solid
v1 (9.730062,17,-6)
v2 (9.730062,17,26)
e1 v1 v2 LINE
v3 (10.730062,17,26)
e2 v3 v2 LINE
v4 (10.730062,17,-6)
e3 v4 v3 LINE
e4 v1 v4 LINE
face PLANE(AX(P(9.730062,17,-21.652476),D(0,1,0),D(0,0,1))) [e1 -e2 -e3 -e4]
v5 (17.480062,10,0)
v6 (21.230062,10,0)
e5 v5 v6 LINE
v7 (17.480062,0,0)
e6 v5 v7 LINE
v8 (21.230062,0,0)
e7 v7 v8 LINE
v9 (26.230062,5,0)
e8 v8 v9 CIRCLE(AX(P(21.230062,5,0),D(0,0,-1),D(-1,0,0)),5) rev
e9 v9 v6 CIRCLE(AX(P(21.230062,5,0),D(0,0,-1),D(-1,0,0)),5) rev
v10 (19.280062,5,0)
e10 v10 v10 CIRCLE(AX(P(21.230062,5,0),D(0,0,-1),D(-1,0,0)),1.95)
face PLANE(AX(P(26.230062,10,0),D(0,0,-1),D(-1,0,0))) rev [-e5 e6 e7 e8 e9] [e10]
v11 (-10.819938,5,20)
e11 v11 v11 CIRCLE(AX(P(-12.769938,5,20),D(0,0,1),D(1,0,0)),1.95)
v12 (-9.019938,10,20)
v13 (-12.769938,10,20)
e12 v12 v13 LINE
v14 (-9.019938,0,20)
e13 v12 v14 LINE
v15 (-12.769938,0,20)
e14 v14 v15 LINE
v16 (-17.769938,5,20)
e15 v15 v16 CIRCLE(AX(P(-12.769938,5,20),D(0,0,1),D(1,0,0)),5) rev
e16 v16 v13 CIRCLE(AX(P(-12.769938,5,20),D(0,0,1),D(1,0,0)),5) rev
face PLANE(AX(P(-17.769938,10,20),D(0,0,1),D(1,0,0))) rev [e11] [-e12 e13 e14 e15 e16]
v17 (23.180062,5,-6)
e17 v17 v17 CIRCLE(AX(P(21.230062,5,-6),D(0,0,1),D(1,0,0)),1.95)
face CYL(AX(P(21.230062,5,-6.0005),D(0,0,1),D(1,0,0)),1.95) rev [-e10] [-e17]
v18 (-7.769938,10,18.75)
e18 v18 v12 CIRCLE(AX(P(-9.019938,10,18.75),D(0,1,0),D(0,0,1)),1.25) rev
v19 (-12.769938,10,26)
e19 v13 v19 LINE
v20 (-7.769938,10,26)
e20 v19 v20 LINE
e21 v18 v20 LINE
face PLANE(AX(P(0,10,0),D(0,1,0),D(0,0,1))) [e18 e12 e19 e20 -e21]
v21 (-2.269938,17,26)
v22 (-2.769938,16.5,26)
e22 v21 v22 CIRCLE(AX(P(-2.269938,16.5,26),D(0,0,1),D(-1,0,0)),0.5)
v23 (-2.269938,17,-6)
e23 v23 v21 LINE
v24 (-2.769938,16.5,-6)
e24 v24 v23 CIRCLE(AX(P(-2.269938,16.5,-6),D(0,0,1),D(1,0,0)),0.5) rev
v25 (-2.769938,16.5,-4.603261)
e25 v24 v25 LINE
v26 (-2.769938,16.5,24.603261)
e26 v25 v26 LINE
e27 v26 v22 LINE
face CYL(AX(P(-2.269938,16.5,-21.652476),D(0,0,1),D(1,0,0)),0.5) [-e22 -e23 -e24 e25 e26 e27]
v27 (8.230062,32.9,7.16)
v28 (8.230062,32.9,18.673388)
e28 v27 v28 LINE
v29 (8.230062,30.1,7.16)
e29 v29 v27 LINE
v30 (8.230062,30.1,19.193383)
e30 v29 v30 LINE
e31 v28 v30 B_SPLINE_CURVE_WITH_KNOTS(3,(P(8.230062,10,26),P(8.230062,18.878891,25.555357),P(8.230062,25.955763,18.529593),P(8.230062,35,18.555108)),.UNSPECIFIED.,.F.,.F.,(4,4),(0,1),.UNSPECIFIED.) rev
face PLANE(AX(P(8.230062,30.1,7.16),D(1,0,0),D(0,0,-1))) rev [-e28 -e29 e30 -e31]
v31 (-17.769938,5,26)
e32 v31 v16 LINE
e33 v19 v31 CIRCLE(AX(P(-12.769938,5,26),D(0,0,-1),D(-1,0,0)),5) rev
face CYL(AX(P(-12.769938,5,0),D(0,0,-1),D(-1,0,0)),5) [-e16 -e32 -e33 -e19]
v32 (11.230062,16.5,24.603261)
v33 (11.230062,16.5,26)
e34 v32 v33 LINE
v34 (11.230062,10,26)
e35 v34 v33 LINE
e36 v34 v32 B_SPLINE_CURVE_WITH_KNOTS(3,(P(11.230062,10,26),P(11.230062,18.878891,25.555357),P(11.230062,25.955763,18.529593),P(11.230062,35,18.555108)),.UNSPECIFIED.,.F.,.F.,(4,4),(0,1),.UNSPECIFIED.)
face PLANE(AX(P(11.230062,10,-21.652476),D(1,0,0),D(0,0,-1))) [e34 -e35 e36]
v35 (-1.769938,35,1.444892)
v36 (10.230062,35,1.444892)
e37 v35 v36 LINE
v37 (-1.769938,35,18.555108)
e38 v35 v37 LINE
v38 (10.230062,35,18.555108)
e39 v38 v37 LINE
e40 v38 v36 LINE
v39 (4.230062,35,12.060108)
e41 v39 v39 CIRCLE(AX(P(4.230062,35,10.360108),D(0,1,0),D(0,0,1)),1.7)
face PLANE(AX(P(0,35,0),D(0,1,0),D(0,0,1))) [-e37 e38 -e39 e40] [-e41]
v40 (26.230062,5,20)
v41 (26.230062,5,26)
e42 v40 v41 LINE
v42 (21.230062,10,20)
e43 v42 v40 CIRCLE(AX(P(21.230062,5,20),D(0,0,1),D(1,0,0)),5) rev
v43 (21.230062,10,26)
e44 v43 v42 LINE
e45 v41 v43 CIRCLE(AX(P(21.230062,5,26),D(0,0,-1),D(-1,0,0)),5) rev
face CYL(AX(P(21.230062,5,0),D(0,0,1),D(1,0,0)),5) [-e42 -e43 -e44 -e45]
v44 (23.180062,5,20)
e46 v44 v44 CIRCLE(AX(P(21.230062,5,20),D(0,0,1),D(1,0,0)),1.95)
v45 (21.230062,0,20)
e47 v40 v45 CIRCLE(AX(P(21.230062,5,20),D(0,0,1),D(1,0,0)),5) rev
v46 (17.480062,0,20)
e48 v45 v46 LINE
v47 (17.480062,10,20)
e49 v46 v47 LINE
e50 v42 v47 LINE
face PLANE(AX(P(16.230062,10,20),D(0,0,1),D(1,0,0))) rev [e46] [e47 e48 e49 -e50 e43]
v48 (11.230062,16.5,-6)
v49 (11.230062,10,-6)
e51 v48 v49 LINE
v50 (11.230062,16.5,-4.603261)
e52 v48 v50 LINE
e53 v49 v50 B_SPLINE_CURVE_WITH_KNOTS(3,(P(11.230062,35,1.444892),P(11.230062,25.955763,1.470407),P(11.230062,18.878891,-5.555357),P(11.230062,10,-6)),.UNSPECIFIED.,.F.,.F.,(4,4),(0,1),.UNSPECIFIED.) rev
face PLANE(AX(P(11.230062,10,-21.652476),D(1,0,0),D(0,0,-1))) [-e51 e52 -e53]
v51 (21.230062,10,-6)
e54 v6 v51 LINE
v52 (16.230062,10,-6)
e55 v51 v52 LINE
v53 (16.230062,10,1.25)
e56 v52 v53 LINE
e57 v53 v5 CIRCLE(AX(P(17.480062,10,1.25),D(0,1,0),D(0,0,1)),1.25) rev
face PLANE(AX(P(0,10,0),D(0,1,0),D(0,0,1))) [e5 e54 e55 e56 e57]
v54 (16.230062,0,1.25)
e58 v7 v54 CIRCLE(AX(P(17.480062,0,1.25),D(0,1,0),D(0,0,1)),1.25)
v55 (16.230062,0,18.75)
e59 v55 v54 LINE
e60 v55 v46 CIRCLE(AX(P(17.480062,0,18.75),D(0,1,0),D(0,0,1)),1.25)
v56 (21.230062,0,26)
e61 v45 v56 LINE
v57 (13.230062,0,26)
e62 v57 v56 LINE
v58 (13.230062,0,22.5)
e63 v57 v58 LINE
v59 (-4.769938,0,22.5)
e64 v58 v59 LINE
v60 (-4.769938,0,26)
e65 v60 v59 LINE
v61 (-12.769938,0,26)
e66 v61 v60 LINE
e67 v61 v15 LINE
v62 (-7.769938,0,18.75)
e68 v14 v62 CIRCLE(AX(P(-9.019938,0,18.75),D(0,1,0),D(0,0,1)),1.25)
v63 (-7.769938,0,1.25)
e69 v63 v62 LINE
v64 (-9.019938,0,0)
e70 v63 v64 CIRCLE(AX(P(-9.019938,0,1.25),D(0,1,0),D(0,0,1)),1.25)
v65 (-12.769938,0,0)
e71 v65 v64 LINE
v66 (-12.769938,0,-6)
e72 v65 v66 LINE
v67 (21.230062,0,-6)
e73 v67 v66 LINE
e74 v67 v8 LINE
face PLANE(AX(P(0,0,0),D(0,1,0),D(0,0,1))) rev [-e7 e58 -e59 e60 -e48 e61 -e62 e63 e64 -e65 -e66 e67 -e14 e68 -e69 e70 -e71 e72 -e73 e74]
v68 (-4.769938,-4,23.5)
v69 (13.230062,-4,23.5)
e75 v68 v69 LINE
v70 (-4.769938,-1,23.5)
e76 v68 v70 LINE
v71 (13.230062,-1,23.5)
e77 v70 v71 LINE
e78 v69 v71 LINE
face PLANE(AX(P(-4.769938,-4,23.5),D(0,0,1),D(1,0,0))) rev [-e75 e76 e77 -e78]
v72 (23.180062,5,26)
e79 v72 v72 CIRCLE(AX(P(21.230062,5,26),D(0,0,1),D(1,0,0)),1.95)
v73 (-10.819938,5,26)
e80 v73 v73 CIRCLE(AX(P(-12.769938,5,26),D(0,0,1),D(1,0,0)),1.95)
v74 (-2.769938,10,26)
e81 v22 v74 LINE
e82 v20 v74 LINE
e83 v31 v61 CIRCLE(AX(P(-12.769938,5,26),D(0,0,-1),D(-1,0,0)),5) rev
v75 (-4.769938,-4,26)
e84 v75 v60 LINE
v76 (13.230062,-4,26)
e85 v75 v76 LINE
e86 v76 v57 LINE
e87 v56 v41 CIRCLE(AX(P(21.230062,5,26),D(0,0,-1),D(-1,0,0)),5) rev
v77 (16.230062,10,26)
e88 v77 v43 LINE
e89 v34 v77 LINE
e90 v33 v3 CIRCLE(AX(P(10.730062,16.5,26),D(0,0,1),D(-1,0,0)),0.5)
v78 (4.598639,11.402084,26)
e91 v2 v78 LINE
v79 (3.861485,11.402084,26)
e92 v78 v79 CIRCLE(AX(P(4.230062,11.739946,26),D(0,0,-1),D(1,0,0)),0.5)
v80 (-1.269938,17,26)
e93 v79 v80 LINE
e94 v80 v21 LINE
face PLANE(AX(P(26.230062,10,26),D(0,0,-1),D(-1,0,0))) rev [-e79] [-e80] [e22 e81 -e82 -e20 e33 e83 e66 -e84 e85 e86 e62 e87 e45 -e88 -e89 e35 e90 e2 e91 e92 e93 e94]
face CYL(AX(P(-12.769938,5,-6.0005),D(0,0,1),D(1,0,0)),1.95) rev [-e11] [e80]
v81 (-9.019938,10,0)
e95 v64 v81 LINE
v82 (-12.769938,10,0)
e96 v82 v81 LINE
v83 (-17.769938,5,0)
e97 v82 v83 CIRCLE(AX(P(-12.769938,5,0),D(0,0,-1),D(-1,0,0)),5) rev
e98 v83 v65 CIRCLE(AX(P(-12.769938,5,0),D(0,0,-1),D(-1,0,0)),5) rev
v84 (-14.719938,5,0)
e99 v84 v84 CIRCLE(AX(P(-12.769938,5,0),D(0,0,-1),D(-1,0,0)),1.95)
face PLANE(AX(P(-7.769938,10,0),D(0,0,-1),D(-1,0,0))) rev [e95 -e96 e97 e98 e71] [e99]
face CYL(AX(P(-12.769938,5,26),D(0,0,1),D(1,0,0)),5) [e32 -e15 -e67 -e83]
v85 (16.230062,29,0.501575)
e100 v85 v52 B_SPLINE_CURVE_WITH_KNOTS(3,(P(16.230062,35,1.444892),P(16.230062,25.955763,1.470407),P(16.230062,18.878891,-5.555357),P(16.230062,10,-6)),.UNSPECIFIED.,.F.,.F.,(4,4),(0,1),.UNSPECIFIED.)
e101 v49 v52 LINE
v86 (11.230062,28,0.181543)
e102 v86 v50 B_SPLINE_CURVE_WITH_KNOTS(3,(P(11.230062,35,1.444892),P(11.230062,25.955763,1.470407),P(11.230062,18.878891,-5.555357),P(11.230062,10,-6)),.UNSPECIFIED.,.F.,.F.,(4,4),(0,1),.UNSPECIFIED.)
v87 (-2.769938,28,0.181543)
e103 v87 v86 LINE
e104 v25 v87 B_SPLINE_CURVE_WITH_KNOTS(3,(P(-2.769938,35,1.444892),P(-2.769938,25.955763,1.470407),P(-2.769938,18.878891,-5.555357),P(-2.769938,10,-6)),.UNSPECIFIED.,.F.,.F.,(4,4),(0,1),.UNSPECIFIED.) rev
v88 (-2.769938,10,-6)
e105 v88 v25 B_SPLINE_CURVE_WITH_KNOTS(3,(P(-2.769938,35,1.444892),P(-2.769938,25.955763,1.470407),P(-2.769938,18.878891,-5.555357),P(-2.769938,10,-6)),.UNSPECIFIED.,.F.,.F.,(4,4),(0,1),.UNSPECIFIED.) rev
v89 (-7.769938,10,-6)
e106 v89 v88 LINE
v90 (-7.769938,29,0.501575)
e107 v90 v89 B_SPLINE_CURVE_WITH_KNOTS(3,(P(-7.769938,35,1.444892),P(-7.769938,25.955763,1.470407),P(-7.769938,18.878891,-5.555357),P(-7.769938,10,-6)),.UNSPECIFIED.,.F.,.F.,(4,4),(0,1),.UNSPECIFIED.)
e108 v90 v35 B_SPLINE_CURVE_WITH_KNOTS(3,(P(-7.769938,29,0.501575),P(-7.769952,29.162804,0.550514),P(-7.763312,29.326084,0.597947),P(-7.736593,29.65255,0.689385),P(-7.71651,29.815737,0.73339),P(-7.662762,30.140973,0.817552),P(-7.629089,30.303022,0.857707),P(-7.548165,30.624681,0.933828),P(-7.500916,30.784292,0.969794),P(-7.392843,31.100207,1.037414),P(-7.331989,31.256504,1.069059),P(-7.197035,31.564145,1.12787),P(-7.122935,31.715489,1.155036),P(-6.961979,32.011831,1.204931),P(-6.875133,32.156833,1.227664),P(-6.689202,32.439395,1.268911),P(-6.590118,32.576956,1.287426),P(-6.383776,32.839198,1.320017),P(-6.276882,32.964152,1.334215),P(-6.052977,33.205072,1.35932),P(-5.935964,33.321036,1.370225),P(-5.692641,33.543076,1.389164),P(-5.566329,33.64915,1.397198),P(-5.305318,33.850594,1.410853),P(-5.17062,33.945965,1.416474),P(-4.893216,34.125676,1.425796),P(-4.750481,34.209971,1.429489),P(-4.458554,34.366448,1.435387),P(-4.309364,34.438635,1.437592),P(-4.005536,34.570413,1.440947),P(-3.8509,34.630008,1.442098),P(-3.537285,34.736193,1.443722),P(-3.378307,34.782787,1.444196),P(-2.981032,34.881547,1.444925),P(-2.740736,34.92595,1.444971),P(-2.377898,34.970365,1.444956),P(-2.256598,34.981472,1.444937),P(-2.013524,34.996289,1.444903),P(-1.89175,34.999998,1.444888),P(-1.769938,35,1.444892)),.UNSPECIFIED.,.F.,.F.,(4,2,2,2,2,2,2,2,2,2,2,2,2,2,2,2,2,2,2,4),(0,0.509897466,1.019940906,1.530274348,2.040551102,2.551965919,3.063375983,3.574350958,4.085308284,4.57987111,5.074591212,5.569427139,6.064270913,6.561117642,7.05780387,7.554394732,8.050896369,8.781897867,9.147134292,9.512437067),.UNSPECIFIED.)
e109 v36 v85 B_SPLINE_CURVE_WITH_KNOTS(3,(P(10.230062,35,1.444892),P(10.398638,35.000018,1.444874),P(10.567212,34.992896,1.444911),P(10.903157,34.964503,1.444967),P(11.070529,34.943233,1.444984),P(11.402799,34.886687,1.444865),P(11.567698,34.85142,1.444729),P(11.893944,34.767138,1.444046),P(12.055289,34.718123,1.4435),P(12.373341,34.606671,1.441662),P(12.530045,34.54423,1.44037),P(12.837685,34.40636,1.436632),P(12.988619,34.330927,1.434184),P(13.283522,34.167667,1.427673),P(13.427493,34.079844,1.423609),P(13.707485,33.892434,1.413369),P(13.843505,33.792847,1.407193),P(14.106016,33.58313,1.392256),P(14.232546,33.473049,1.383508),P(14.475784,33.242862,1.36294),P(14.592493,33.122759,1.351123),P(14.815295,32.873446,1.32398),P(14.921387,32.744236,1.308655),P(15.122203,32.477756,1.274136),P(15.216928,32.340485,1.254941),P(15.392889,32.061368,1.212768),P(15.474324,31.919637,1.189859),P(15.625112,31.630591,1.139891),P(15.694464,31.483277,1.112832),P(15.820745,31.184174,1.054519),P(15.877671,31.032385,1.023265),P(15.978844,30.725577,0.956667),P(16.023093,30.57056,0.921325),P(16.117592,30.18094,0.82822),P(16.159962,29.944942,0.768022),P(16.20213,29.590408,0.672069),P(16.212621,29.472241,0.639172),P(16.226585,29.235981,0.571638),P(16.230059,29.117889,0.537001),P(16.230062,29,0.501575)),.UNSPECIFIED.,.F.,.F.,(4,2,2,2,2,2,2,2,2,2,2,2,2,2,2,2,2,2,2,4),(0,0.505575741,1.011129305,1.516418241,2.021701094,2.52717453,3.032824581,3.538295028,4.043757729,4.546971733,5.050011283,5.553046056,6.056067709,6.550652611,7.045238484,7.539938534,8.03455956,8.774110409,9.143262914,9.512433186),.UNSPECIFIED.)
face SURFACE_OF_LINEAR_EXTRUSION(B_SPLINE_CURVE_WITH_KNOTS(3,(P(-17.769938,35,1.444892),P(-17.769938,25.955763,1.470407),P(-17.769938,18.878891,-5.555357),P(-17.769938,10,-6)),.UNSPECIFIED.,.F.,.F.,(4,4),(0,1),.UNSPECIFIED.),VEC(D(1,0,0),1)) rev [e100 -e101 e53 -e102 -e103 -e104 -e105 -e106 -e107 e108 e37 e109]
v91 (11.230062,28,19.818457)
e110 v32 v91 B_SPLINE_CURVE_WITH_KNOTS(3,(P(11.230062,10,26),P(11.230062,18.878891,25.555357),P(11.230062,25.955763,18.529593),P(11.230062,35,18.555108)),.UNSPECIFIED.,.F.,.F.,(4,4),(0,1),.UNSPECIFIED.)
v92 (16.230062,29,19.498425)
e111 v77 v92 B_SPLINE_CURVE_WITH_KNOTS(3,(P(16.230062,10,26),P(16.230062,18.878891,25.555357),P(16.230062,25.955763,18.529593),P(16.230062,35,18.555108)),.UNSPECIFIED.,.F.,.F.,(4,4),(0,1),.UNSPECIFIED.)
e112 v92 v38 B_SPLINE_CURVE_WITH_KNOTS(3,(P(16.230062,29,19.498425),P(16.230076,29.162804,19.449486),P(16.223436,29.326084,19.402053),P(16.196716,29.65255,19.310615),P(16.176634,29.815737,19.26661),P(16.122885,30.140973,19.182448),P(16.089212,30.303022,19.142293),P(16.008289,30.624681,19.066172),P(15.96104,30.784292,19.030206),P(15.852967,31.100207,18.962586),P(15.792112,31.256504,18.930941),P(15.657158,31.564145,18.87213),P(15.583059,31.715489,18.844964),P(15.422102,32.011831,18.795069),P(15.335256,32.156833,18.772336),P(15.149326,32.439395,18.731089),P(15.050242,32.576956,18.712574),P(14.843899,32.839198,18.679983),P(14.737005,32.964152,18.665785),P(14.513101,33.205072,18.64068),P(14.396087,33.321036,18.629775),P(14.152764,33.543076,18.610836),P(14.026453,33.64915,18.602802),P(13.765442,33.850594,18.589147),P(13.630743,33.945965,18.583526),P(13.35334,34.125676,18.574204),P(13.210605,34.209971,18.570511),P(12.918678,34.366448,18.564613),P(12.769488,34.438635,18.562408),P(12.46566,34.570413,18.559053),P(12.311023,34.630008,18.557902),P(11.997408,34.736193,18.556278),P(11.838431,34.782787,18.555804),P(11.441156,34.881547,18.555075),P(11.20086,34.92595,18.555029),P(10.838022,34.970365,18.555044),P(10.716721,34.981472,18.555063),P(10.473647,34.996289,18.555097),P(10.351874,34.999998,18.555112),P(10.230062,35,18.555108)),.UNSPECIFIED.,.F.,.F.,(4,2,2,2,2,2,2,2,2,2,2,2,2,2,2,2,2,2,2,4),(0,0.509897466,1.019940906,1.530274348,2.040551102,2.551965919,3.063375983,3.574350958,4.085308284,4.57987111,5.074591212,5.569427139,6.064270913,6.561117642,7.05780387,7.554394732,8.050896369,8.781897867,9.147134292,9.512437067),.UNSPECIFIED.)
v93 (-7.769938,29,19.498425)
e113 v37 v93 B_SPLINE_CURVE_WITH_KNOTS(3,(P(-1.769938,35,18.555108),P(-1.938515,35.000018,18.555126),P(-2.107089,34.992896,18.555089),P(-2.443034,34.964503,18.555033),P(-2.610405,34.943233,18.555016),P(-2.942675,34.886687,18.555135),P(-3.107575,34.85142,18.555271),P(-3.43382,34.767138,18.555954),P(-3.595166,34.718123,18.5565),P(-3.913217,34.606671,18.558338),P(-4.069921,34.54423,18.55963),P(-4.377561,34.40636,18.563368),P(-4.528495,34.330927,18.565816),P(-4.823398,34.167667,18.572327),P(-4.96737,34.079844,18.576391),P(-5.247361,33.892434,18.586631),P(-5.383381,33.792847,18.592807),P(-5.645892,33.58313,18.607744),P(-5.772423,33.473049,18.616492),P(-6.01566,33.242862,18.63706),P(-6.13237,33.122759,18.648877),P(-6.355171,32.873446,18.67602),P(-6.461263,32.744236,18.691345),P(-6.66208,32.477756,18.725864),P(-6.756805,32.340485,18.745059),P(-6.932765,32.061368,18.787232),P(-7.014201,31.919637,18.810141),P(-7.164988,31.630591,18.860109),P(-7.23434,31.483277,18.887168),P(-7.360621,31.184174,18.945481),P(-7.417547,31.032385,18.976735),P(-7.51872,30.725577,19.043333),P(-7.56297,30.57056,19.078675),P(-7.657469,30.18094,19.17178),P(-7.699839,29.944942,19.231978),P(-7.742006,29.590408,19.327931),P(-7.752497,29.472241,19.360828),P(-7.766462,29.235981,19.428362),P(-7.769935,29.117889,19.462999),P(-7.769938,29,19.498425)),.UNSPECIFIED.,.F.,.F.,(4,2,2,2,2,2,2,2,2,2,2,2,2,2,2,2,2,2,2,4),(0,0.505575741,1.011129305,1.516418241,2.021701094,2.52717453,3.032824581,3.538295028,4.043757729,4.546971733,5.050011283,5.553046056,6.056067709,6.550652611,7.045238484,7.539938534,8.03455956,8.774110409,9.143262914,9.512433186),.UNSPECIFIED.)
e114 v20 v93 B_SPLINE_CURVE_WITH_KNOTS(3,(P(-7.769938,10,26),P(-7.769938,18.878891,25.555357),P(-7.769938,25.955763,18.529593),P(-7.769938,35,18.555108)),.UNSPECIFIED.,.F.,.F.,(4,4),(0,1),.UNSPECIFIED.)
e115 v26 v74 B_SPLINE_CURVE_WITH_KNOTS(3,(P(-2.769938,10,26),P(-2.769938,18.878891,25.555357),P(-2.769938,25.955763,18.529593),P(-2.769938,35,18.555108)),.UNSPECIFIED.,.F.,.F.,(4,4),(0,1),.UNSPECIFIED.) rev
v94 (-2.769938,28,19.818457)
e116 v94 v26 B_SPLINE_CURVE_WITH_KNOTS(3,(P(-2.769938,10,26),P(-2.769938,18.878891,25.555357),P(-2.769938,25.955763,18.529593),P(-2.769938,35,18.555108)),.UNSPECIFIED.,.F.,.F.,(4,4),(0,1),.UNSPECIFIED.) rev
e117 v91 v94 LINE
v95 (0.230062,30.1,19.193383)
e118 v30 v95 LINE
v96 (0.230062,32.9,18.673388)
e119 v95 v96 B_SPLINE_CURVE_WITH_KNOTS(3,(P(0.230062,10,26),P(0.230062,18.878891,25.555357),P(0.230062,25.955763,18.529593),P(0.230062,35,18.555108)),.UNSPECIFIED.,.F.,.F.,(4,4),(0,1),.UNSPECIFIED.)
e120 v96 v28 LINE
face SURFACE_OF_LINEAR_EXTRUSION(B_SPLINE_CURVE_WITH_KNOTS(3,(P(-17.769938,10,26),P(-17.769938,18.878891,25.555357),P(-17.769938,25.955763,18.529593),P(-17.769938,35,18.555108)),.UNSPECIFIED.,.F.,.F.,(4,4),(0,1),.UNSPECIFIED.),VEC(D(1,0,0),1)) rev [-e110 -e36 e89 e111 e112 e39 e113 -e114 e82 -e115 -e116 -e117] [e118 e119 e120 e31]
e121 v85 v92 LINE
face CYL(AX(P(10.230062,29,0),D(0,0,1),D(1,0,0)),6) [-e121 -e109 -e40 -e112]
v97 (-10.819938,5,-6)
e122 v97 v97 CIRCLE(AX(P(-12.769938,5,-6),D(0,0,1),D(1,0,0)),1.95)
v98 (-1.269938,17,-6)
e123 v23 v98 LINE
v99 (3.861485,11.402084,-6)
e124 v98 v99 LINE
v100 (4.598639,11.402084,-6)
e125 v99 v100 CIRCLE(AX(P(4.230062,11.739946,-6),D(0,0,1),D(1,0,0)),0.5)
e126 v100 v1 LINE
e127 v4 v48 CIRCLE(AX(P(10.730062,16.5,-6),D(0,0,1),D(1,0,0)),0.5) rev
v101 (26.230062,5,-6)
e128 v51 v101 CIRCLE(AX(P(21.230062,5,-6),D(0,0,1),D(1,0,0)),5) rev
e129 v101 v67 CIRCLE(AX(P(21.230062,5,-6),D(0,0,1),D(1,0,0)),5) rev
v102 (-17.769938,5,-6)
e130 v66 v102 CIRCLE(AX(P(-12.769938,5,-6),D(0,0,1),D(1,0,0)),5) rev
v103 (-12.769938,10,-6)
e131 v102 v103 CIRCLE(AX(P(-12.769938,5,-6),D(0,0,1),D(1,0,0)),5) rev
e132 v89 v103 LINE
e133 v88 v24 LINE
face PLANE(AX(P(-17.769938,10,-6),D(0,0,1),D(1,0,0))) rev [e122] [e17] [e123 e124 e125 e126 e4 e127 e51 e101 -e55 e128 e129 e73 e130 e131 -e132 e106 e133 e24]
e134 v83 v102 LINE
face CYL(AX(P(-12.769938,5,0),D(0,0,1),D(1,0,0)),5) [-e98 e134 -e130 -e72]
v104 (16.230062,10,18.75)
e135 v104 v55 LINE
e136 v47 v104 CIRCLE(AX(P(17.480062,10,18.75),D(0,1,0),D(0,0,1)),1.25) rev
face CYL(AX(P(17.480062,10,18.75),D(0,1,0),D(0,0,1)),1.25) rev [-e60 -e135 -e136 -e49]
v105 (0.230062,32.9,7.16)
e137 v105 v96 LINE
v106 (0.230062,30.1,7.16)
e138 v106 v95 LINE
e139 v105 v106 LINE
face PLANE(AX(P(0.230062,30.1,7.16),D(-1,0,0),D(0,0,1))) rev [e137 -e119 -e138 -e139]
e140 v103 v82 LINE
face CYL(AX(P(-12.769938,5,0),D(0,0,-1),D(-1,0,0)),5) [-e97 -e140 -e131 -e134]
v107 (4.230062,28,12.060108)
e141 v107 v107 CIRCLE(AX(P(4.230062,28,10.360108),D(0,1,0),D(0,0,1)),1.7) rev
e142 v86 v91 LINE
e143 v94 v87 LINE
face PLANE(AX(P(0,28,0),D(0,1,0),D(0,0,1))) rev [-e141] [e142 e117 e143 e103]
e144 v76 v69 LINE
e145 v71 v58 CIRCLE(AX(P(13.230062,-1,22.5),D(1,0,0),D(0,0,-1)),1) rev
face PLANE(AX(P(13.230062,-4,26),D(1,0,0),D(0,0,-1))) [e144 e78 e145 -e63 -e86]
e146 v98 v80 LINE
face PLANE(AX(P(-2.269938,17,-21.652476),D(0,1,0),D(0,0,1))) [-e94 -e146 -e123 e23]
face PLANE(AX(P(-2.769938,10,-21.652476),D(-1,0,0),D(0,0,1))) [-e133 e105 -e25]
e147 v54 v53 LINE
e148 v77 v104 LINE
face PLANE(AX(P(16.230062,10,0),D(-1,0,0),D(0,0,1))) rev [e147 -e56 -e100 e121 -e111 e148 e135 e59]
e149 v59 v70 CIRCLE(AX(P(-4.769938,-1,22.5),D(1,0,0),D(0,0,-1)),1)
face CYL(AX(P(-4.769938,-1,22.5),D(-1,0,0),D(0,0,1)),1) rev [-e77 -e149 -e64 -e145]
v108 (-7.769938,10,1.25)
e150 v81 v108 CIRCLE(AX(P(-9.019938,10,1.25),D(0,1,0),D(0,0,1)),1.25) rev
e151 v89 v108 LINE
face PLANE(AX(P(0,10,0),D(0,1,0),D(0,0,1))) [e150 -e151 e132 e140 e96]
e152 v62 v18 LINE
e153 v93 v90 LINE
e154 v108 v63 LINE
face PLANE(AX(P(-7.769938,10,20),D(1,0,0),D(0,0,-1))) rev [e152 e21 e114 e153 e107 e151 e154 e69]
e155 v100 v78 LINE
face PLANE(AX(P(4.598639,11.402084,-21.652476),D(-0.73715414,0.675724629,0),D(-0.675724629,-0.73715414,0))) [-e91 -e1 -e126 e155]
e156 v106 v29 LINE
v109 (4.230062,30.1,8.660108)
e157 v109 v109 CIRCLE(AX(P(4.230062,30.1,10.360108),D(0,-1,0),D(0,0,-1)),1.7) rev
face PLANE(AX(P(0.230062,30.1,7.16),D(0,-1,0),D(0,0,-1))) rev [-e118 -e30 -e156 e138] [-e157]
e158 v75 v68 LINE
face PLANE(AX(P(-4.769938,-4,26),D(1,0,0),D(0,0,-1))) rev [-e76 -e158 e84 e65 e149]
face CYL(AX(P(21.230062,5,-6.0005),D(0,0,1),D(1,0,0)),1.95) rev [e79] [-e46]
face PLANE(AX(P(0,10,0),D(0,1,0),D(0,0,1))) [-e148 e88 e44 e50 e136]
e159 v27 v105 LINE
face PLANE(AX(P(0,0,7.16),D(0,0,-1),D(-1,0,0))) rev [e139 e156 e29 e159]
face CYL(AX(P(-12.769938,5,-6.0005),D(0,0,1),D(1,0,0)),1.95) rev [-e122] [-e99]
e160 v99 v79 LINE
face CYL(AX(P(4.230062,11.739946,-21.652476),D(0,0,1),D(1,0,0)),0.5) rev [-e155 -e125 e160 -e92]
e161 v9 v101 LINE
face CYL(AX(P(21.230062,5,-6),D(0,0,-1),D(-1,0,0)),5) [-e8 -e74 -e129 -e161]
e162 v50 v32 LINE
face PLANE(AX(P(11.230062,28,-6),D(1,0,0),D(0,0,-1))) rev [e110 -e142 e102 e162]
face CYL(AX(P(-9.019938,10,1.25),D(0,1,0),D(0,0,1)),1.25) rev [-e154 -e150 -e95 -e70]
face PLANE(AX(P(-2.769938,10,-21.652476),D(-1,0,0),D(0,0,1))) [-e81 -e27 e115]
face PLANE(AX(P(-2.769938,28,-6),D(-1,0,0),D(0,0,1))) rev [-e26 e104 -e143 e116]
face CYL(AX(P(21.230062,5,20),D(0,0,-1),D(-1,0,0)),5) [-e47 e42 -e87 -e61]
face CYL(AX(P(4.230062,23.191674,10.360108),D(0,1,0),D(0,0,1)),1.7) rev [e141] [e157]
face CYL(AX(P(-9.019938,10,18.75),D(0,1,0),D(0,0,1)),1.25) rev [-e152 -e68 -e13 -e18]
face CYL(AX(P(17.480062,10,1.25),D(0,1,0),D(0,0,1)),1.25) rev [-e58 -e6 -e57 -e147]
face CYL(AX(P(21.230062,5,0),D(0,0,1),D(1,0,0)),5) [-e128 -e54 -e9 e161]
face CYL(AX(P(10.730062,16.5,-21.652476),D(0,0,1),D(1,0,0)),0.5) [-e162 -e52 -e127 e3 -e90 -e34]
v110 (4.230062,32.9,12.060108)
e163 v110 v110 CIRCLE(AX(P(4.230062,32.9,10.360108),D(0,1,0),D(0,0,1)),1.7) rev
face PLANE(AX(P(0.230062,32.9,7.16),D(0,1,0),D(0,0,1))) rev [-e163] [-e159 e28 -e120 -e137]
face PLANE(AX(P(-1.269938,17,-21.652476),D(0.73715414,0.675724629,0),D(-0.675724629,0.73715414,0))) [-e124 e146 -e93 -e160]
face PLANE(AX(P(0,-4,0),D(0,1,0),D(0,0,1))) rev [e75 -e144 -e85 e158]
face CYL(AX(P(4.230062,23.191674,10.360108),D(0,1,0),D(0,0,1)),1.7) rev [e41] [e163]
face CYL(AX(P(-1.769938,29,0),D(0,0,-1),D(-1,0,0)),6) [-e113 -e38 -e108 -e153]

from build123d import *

# Parameters (mm, degrees)
BOSS_EXTRUDE1_DEPTH = 10
SKETCH2_W           = 5
SKETCH2_H           = 32
BOSS_EXTRUDE2_DEPTH = 18
SKETCH3_W           = 24
SKETCH3_H           = 20
BOSS_EXTRUDE3_DEPTH = 7
CUT_EXTRUDE1_DEPTH  = 56.290143787
BOSS_EXTRUDE4_REACH = 56.194
SKETCH7_R           = 1.7
CUT_EXTRUDE2_DEPTH  = 7
SKETCH6_W           = 8
SKETCH6_H           = 2.8
CUT_EXTRUDE3_DEPTH  = 13.34
SKETCH8_R           = 1.95
CUT_EXTRUDE4_DEPTH  = 55.194244669
FILLET1_R           = 5
FILLET2_R           = 1.25
FILLET3_R           = 6
SKETCH9_W           = 18
SKETCH9_H           = 2.5
BOSS_EXTRUDE5_DEPTH = 4
FILLET4_R           = 1


with BuildPart() as part:
    # Sketch1 → Boss-Extrude1 (new body)
    with BuildSketch(Plane(origin=(0, 0, 0), x_dir=(1, 0, 0), z_dir=(0, 1, 0))):
        Polygon((-17.769938204, -26), (-17.769938204, -20), (-7.769938204, -20), (-7.769938204, 0), (-17.769938204, 0), (-17.769938204, 6), (26.230061796, 6), (26.230061796, 0), (16.230061796, 0), (16.230061796, -20), (26.230061796, -20), (26.230061796, -26), align=None)
    extrude(amount=BOSS_EXTRUDE1_DEPTH)

    # Sketch2 → Boss-Extrude2 (add)
    with BuildSketch(Plane(origin=(0, 10, 0), x_dir=(1, 0, 0), z_dir=(0, 1, 0))):
        with Locations((-5.269938204, -10)):
            Rectangle(SKETCH2_W, SKETCH2_H)
        with Locations((13.730061796, -10)):
            Rectangle(SKETCH2_W, SKETCH2_H)
    extrude(amount=BOSS_EXTRUDE2_DEPTH)

    # Sketch3 → Boss-Extrude3 (add)
    with BuildSketch(Plane(origin=(0, 28, 0), x_dir=(1, 0, 0), z_dir=(0, 1, 0))):
        with Locations((4.230061796, -10)):
            Rectangle(SKETCH3_W, SKETCH3_H)
    extrude(amount=BOSS_EXTRUDE3_DEPTH)

    # Sketch4 → Cut-Extrude1 (cut, through all)
    with BuildSketch(Plane(origin=(16.230061796, 0, 0), x_dir=(0, 0, -1), z_dir=(1, 0, 0))):
        with BuildLine():
            Line((-26, 10), (-26, 35))
            Line((-26, 35), (-18.555107994, 35))
            add(Edge.make_bspline(
                [(-26, 10), (-25.555357091, 18.878891188), (-18.529592831, 25.955762579), (-18.555107994, 35)],
                knots=[0, 0, 0, 0, 1, 1, 1, 1], degree=3))
        make_face()
        with BuildLine():
            Line((6, 10), (6, 35))
            Line((6, 35), (-1.444892006, 35))
            add(Edge.make_bspline(
                [(6, 10), (5.555357091, 18.878891188), (-1.470407169, 25.955762579), (-1.444892006, 35)],
                knots=[0, 0, 0, 0, 1, 1, 1, 1], degree=3))
        make_face()
    extrude(amount=-CUT_EXTRUDE1_DEPTH, mode=Mode.SUBTRACT)

    # Boss-Extrude4: up to this face of the body (flat: up to its plane)
    boss_extrude4_end = Plane(part.part.faces().sort_by_distance((4.230061796, 5, -6))[0])
    # Sketch5 → Boss-Extrude4 (add, up to the picked face)
    with BuildSketch(Plane.XY.offset(26), mode=Mode.PRIVATE) as boss_extrude4_sk1:
        with BuildLine():
            Line((-2.769938204, 10), (11.230061796, 10))
            Line((11.230061796, 10), (11.230061796, 16.5))
            ThreePointArc((11.230061796, 16.5), (11.083615187, 16.853553391), (10.730061796, 17))
            Line((10.730061796, 17), (9.730061796, 17))
            Line((9.730061796, 17), (4.598638866, 11.402084076))
            ThreePointArc((4.598638866, 11.402084076), (4.230061796, 11.239946391), (3.861484726, 11.402084076))
            Line((3.861484726, 11.402084076), (-1.269938204, 17))
            Line((-1.269938204, 17), (-2.269938204, 17))
            ThreePointArc((-2.269938204, 17), (-2.623491594, 16.853553391), (-2.769938204, 16.5))
            Line((-2.769938204, 16.5), (-2.769938204, 10))
        make_face()
    boss_extrude4_tool1 = split(extrude(boss_extrude4_sk1.sketch, amount=-BOSS_EXTRUDE4_REACH, mode=Mode.PRIVATE), bisect_by=boss_extrude4_end, keep=Keep.BOTH, mode=Mode.PRIVATE)
    add(boss_extrude4_tool1.solids().sort_by(Axis((-2.613413, 13.25, 26), (0, 0, -1)))[0])

    # Sketch7 → Cut-Extrude2 (cut)
    with BuildSketch(Plane(origin=(0, 35, 0), x_dir=(1, 0, 0), z_dir=(0, 1, 0))):
        with Locations(Location((4.230061796, -10.360107994, 0), (0, 0, 270))):
            Circle(SKETCH7_R)
    extrude(amount=-CUT_EXTRUDE2_DEPTH, mode=Mode.SUBTRACT)

    # Sketch6 → Cut-Extrude3 (cut)
    with BuildSketch(Plane.XY.offset(20.5)):
        with Locations((4.230061796, 31.5)):
            Rectangle(SKETCH6_W, SKETCH6_H)
    extrude(amount=-CUT_EXTRUDE3_DEPTH, mode=Mode.SUBTRACT)

    # Sketch8 → Cut-Extrude4 (cut, through all)
    with BuildSketch(Plane.XY.offset(26)):
        with Locations((21.230061796, 5)):
            Circle(SKETCH8_R)
        with Locations((-12.769938204, 5)):
            Circle(SKETCH8_R)
    extrude(amount=-CUT_EXTRUDE4_DEPTH, mode=Mode.SUBTRACT)

    # Fillet1
    fillet1_edges = [part.edges().sort_by_distance(p)[0] for p in [
        (-17.769938204, 0, -3),
        (-17.769938204, 10, -3),
        (-17.769938204, 0, 23),
        (-17.769938204, 10, 23),
        (26.230061796, 10, -3),
        (26.230061796, 0, -3),
        (26.230061796, 0, 23),
        (26.230061796, 10, 23),
    ]]
    fillet(fillet1_edges, radius=FILLET1_R - 0.0001)  # a hair under: the kernel refuses the full size

    # Fillet2
    fillet2_edges = [part.edges().sort_by_distance(p)[0] for p in [
        (-7.769938204, 5, 20),
        (-7.769938204, 5, 0),
        (16.230061796, 5, 0),
        (16.230061796, 5, 20),
    ]]
    fillet(fillet2_edges, radius=FILLET2_R)

    # Fillet3
    fillet3_edges = [part.edges().sort_by_distance(p)[0] for p in [
        (16.230061796, 35, 10),
        (-7.769938204, 35, 10),
    ]]
    fillet(fillet3_edges, radius=FILLET3_R)

    # Sketch9 → Boss-Extrude5 (add)
    with BuildSketch(Plane.XZ):
        with Locations((4.230061796, 24.75)):
            Rectangle(SKETCH9_W, SKETCH9_H)
    extrude(amount=BOSS_EXTRUDE5_DEPTH)

    # Fillet4
    fillet4_edges = [part.edges().sort_by_distance(p)[0] for p in [
        (4.230061796, 0, 23.5),
    ]]
    fillet(fillet4_edges, radius=FILLET4_R)


solid = part.part
